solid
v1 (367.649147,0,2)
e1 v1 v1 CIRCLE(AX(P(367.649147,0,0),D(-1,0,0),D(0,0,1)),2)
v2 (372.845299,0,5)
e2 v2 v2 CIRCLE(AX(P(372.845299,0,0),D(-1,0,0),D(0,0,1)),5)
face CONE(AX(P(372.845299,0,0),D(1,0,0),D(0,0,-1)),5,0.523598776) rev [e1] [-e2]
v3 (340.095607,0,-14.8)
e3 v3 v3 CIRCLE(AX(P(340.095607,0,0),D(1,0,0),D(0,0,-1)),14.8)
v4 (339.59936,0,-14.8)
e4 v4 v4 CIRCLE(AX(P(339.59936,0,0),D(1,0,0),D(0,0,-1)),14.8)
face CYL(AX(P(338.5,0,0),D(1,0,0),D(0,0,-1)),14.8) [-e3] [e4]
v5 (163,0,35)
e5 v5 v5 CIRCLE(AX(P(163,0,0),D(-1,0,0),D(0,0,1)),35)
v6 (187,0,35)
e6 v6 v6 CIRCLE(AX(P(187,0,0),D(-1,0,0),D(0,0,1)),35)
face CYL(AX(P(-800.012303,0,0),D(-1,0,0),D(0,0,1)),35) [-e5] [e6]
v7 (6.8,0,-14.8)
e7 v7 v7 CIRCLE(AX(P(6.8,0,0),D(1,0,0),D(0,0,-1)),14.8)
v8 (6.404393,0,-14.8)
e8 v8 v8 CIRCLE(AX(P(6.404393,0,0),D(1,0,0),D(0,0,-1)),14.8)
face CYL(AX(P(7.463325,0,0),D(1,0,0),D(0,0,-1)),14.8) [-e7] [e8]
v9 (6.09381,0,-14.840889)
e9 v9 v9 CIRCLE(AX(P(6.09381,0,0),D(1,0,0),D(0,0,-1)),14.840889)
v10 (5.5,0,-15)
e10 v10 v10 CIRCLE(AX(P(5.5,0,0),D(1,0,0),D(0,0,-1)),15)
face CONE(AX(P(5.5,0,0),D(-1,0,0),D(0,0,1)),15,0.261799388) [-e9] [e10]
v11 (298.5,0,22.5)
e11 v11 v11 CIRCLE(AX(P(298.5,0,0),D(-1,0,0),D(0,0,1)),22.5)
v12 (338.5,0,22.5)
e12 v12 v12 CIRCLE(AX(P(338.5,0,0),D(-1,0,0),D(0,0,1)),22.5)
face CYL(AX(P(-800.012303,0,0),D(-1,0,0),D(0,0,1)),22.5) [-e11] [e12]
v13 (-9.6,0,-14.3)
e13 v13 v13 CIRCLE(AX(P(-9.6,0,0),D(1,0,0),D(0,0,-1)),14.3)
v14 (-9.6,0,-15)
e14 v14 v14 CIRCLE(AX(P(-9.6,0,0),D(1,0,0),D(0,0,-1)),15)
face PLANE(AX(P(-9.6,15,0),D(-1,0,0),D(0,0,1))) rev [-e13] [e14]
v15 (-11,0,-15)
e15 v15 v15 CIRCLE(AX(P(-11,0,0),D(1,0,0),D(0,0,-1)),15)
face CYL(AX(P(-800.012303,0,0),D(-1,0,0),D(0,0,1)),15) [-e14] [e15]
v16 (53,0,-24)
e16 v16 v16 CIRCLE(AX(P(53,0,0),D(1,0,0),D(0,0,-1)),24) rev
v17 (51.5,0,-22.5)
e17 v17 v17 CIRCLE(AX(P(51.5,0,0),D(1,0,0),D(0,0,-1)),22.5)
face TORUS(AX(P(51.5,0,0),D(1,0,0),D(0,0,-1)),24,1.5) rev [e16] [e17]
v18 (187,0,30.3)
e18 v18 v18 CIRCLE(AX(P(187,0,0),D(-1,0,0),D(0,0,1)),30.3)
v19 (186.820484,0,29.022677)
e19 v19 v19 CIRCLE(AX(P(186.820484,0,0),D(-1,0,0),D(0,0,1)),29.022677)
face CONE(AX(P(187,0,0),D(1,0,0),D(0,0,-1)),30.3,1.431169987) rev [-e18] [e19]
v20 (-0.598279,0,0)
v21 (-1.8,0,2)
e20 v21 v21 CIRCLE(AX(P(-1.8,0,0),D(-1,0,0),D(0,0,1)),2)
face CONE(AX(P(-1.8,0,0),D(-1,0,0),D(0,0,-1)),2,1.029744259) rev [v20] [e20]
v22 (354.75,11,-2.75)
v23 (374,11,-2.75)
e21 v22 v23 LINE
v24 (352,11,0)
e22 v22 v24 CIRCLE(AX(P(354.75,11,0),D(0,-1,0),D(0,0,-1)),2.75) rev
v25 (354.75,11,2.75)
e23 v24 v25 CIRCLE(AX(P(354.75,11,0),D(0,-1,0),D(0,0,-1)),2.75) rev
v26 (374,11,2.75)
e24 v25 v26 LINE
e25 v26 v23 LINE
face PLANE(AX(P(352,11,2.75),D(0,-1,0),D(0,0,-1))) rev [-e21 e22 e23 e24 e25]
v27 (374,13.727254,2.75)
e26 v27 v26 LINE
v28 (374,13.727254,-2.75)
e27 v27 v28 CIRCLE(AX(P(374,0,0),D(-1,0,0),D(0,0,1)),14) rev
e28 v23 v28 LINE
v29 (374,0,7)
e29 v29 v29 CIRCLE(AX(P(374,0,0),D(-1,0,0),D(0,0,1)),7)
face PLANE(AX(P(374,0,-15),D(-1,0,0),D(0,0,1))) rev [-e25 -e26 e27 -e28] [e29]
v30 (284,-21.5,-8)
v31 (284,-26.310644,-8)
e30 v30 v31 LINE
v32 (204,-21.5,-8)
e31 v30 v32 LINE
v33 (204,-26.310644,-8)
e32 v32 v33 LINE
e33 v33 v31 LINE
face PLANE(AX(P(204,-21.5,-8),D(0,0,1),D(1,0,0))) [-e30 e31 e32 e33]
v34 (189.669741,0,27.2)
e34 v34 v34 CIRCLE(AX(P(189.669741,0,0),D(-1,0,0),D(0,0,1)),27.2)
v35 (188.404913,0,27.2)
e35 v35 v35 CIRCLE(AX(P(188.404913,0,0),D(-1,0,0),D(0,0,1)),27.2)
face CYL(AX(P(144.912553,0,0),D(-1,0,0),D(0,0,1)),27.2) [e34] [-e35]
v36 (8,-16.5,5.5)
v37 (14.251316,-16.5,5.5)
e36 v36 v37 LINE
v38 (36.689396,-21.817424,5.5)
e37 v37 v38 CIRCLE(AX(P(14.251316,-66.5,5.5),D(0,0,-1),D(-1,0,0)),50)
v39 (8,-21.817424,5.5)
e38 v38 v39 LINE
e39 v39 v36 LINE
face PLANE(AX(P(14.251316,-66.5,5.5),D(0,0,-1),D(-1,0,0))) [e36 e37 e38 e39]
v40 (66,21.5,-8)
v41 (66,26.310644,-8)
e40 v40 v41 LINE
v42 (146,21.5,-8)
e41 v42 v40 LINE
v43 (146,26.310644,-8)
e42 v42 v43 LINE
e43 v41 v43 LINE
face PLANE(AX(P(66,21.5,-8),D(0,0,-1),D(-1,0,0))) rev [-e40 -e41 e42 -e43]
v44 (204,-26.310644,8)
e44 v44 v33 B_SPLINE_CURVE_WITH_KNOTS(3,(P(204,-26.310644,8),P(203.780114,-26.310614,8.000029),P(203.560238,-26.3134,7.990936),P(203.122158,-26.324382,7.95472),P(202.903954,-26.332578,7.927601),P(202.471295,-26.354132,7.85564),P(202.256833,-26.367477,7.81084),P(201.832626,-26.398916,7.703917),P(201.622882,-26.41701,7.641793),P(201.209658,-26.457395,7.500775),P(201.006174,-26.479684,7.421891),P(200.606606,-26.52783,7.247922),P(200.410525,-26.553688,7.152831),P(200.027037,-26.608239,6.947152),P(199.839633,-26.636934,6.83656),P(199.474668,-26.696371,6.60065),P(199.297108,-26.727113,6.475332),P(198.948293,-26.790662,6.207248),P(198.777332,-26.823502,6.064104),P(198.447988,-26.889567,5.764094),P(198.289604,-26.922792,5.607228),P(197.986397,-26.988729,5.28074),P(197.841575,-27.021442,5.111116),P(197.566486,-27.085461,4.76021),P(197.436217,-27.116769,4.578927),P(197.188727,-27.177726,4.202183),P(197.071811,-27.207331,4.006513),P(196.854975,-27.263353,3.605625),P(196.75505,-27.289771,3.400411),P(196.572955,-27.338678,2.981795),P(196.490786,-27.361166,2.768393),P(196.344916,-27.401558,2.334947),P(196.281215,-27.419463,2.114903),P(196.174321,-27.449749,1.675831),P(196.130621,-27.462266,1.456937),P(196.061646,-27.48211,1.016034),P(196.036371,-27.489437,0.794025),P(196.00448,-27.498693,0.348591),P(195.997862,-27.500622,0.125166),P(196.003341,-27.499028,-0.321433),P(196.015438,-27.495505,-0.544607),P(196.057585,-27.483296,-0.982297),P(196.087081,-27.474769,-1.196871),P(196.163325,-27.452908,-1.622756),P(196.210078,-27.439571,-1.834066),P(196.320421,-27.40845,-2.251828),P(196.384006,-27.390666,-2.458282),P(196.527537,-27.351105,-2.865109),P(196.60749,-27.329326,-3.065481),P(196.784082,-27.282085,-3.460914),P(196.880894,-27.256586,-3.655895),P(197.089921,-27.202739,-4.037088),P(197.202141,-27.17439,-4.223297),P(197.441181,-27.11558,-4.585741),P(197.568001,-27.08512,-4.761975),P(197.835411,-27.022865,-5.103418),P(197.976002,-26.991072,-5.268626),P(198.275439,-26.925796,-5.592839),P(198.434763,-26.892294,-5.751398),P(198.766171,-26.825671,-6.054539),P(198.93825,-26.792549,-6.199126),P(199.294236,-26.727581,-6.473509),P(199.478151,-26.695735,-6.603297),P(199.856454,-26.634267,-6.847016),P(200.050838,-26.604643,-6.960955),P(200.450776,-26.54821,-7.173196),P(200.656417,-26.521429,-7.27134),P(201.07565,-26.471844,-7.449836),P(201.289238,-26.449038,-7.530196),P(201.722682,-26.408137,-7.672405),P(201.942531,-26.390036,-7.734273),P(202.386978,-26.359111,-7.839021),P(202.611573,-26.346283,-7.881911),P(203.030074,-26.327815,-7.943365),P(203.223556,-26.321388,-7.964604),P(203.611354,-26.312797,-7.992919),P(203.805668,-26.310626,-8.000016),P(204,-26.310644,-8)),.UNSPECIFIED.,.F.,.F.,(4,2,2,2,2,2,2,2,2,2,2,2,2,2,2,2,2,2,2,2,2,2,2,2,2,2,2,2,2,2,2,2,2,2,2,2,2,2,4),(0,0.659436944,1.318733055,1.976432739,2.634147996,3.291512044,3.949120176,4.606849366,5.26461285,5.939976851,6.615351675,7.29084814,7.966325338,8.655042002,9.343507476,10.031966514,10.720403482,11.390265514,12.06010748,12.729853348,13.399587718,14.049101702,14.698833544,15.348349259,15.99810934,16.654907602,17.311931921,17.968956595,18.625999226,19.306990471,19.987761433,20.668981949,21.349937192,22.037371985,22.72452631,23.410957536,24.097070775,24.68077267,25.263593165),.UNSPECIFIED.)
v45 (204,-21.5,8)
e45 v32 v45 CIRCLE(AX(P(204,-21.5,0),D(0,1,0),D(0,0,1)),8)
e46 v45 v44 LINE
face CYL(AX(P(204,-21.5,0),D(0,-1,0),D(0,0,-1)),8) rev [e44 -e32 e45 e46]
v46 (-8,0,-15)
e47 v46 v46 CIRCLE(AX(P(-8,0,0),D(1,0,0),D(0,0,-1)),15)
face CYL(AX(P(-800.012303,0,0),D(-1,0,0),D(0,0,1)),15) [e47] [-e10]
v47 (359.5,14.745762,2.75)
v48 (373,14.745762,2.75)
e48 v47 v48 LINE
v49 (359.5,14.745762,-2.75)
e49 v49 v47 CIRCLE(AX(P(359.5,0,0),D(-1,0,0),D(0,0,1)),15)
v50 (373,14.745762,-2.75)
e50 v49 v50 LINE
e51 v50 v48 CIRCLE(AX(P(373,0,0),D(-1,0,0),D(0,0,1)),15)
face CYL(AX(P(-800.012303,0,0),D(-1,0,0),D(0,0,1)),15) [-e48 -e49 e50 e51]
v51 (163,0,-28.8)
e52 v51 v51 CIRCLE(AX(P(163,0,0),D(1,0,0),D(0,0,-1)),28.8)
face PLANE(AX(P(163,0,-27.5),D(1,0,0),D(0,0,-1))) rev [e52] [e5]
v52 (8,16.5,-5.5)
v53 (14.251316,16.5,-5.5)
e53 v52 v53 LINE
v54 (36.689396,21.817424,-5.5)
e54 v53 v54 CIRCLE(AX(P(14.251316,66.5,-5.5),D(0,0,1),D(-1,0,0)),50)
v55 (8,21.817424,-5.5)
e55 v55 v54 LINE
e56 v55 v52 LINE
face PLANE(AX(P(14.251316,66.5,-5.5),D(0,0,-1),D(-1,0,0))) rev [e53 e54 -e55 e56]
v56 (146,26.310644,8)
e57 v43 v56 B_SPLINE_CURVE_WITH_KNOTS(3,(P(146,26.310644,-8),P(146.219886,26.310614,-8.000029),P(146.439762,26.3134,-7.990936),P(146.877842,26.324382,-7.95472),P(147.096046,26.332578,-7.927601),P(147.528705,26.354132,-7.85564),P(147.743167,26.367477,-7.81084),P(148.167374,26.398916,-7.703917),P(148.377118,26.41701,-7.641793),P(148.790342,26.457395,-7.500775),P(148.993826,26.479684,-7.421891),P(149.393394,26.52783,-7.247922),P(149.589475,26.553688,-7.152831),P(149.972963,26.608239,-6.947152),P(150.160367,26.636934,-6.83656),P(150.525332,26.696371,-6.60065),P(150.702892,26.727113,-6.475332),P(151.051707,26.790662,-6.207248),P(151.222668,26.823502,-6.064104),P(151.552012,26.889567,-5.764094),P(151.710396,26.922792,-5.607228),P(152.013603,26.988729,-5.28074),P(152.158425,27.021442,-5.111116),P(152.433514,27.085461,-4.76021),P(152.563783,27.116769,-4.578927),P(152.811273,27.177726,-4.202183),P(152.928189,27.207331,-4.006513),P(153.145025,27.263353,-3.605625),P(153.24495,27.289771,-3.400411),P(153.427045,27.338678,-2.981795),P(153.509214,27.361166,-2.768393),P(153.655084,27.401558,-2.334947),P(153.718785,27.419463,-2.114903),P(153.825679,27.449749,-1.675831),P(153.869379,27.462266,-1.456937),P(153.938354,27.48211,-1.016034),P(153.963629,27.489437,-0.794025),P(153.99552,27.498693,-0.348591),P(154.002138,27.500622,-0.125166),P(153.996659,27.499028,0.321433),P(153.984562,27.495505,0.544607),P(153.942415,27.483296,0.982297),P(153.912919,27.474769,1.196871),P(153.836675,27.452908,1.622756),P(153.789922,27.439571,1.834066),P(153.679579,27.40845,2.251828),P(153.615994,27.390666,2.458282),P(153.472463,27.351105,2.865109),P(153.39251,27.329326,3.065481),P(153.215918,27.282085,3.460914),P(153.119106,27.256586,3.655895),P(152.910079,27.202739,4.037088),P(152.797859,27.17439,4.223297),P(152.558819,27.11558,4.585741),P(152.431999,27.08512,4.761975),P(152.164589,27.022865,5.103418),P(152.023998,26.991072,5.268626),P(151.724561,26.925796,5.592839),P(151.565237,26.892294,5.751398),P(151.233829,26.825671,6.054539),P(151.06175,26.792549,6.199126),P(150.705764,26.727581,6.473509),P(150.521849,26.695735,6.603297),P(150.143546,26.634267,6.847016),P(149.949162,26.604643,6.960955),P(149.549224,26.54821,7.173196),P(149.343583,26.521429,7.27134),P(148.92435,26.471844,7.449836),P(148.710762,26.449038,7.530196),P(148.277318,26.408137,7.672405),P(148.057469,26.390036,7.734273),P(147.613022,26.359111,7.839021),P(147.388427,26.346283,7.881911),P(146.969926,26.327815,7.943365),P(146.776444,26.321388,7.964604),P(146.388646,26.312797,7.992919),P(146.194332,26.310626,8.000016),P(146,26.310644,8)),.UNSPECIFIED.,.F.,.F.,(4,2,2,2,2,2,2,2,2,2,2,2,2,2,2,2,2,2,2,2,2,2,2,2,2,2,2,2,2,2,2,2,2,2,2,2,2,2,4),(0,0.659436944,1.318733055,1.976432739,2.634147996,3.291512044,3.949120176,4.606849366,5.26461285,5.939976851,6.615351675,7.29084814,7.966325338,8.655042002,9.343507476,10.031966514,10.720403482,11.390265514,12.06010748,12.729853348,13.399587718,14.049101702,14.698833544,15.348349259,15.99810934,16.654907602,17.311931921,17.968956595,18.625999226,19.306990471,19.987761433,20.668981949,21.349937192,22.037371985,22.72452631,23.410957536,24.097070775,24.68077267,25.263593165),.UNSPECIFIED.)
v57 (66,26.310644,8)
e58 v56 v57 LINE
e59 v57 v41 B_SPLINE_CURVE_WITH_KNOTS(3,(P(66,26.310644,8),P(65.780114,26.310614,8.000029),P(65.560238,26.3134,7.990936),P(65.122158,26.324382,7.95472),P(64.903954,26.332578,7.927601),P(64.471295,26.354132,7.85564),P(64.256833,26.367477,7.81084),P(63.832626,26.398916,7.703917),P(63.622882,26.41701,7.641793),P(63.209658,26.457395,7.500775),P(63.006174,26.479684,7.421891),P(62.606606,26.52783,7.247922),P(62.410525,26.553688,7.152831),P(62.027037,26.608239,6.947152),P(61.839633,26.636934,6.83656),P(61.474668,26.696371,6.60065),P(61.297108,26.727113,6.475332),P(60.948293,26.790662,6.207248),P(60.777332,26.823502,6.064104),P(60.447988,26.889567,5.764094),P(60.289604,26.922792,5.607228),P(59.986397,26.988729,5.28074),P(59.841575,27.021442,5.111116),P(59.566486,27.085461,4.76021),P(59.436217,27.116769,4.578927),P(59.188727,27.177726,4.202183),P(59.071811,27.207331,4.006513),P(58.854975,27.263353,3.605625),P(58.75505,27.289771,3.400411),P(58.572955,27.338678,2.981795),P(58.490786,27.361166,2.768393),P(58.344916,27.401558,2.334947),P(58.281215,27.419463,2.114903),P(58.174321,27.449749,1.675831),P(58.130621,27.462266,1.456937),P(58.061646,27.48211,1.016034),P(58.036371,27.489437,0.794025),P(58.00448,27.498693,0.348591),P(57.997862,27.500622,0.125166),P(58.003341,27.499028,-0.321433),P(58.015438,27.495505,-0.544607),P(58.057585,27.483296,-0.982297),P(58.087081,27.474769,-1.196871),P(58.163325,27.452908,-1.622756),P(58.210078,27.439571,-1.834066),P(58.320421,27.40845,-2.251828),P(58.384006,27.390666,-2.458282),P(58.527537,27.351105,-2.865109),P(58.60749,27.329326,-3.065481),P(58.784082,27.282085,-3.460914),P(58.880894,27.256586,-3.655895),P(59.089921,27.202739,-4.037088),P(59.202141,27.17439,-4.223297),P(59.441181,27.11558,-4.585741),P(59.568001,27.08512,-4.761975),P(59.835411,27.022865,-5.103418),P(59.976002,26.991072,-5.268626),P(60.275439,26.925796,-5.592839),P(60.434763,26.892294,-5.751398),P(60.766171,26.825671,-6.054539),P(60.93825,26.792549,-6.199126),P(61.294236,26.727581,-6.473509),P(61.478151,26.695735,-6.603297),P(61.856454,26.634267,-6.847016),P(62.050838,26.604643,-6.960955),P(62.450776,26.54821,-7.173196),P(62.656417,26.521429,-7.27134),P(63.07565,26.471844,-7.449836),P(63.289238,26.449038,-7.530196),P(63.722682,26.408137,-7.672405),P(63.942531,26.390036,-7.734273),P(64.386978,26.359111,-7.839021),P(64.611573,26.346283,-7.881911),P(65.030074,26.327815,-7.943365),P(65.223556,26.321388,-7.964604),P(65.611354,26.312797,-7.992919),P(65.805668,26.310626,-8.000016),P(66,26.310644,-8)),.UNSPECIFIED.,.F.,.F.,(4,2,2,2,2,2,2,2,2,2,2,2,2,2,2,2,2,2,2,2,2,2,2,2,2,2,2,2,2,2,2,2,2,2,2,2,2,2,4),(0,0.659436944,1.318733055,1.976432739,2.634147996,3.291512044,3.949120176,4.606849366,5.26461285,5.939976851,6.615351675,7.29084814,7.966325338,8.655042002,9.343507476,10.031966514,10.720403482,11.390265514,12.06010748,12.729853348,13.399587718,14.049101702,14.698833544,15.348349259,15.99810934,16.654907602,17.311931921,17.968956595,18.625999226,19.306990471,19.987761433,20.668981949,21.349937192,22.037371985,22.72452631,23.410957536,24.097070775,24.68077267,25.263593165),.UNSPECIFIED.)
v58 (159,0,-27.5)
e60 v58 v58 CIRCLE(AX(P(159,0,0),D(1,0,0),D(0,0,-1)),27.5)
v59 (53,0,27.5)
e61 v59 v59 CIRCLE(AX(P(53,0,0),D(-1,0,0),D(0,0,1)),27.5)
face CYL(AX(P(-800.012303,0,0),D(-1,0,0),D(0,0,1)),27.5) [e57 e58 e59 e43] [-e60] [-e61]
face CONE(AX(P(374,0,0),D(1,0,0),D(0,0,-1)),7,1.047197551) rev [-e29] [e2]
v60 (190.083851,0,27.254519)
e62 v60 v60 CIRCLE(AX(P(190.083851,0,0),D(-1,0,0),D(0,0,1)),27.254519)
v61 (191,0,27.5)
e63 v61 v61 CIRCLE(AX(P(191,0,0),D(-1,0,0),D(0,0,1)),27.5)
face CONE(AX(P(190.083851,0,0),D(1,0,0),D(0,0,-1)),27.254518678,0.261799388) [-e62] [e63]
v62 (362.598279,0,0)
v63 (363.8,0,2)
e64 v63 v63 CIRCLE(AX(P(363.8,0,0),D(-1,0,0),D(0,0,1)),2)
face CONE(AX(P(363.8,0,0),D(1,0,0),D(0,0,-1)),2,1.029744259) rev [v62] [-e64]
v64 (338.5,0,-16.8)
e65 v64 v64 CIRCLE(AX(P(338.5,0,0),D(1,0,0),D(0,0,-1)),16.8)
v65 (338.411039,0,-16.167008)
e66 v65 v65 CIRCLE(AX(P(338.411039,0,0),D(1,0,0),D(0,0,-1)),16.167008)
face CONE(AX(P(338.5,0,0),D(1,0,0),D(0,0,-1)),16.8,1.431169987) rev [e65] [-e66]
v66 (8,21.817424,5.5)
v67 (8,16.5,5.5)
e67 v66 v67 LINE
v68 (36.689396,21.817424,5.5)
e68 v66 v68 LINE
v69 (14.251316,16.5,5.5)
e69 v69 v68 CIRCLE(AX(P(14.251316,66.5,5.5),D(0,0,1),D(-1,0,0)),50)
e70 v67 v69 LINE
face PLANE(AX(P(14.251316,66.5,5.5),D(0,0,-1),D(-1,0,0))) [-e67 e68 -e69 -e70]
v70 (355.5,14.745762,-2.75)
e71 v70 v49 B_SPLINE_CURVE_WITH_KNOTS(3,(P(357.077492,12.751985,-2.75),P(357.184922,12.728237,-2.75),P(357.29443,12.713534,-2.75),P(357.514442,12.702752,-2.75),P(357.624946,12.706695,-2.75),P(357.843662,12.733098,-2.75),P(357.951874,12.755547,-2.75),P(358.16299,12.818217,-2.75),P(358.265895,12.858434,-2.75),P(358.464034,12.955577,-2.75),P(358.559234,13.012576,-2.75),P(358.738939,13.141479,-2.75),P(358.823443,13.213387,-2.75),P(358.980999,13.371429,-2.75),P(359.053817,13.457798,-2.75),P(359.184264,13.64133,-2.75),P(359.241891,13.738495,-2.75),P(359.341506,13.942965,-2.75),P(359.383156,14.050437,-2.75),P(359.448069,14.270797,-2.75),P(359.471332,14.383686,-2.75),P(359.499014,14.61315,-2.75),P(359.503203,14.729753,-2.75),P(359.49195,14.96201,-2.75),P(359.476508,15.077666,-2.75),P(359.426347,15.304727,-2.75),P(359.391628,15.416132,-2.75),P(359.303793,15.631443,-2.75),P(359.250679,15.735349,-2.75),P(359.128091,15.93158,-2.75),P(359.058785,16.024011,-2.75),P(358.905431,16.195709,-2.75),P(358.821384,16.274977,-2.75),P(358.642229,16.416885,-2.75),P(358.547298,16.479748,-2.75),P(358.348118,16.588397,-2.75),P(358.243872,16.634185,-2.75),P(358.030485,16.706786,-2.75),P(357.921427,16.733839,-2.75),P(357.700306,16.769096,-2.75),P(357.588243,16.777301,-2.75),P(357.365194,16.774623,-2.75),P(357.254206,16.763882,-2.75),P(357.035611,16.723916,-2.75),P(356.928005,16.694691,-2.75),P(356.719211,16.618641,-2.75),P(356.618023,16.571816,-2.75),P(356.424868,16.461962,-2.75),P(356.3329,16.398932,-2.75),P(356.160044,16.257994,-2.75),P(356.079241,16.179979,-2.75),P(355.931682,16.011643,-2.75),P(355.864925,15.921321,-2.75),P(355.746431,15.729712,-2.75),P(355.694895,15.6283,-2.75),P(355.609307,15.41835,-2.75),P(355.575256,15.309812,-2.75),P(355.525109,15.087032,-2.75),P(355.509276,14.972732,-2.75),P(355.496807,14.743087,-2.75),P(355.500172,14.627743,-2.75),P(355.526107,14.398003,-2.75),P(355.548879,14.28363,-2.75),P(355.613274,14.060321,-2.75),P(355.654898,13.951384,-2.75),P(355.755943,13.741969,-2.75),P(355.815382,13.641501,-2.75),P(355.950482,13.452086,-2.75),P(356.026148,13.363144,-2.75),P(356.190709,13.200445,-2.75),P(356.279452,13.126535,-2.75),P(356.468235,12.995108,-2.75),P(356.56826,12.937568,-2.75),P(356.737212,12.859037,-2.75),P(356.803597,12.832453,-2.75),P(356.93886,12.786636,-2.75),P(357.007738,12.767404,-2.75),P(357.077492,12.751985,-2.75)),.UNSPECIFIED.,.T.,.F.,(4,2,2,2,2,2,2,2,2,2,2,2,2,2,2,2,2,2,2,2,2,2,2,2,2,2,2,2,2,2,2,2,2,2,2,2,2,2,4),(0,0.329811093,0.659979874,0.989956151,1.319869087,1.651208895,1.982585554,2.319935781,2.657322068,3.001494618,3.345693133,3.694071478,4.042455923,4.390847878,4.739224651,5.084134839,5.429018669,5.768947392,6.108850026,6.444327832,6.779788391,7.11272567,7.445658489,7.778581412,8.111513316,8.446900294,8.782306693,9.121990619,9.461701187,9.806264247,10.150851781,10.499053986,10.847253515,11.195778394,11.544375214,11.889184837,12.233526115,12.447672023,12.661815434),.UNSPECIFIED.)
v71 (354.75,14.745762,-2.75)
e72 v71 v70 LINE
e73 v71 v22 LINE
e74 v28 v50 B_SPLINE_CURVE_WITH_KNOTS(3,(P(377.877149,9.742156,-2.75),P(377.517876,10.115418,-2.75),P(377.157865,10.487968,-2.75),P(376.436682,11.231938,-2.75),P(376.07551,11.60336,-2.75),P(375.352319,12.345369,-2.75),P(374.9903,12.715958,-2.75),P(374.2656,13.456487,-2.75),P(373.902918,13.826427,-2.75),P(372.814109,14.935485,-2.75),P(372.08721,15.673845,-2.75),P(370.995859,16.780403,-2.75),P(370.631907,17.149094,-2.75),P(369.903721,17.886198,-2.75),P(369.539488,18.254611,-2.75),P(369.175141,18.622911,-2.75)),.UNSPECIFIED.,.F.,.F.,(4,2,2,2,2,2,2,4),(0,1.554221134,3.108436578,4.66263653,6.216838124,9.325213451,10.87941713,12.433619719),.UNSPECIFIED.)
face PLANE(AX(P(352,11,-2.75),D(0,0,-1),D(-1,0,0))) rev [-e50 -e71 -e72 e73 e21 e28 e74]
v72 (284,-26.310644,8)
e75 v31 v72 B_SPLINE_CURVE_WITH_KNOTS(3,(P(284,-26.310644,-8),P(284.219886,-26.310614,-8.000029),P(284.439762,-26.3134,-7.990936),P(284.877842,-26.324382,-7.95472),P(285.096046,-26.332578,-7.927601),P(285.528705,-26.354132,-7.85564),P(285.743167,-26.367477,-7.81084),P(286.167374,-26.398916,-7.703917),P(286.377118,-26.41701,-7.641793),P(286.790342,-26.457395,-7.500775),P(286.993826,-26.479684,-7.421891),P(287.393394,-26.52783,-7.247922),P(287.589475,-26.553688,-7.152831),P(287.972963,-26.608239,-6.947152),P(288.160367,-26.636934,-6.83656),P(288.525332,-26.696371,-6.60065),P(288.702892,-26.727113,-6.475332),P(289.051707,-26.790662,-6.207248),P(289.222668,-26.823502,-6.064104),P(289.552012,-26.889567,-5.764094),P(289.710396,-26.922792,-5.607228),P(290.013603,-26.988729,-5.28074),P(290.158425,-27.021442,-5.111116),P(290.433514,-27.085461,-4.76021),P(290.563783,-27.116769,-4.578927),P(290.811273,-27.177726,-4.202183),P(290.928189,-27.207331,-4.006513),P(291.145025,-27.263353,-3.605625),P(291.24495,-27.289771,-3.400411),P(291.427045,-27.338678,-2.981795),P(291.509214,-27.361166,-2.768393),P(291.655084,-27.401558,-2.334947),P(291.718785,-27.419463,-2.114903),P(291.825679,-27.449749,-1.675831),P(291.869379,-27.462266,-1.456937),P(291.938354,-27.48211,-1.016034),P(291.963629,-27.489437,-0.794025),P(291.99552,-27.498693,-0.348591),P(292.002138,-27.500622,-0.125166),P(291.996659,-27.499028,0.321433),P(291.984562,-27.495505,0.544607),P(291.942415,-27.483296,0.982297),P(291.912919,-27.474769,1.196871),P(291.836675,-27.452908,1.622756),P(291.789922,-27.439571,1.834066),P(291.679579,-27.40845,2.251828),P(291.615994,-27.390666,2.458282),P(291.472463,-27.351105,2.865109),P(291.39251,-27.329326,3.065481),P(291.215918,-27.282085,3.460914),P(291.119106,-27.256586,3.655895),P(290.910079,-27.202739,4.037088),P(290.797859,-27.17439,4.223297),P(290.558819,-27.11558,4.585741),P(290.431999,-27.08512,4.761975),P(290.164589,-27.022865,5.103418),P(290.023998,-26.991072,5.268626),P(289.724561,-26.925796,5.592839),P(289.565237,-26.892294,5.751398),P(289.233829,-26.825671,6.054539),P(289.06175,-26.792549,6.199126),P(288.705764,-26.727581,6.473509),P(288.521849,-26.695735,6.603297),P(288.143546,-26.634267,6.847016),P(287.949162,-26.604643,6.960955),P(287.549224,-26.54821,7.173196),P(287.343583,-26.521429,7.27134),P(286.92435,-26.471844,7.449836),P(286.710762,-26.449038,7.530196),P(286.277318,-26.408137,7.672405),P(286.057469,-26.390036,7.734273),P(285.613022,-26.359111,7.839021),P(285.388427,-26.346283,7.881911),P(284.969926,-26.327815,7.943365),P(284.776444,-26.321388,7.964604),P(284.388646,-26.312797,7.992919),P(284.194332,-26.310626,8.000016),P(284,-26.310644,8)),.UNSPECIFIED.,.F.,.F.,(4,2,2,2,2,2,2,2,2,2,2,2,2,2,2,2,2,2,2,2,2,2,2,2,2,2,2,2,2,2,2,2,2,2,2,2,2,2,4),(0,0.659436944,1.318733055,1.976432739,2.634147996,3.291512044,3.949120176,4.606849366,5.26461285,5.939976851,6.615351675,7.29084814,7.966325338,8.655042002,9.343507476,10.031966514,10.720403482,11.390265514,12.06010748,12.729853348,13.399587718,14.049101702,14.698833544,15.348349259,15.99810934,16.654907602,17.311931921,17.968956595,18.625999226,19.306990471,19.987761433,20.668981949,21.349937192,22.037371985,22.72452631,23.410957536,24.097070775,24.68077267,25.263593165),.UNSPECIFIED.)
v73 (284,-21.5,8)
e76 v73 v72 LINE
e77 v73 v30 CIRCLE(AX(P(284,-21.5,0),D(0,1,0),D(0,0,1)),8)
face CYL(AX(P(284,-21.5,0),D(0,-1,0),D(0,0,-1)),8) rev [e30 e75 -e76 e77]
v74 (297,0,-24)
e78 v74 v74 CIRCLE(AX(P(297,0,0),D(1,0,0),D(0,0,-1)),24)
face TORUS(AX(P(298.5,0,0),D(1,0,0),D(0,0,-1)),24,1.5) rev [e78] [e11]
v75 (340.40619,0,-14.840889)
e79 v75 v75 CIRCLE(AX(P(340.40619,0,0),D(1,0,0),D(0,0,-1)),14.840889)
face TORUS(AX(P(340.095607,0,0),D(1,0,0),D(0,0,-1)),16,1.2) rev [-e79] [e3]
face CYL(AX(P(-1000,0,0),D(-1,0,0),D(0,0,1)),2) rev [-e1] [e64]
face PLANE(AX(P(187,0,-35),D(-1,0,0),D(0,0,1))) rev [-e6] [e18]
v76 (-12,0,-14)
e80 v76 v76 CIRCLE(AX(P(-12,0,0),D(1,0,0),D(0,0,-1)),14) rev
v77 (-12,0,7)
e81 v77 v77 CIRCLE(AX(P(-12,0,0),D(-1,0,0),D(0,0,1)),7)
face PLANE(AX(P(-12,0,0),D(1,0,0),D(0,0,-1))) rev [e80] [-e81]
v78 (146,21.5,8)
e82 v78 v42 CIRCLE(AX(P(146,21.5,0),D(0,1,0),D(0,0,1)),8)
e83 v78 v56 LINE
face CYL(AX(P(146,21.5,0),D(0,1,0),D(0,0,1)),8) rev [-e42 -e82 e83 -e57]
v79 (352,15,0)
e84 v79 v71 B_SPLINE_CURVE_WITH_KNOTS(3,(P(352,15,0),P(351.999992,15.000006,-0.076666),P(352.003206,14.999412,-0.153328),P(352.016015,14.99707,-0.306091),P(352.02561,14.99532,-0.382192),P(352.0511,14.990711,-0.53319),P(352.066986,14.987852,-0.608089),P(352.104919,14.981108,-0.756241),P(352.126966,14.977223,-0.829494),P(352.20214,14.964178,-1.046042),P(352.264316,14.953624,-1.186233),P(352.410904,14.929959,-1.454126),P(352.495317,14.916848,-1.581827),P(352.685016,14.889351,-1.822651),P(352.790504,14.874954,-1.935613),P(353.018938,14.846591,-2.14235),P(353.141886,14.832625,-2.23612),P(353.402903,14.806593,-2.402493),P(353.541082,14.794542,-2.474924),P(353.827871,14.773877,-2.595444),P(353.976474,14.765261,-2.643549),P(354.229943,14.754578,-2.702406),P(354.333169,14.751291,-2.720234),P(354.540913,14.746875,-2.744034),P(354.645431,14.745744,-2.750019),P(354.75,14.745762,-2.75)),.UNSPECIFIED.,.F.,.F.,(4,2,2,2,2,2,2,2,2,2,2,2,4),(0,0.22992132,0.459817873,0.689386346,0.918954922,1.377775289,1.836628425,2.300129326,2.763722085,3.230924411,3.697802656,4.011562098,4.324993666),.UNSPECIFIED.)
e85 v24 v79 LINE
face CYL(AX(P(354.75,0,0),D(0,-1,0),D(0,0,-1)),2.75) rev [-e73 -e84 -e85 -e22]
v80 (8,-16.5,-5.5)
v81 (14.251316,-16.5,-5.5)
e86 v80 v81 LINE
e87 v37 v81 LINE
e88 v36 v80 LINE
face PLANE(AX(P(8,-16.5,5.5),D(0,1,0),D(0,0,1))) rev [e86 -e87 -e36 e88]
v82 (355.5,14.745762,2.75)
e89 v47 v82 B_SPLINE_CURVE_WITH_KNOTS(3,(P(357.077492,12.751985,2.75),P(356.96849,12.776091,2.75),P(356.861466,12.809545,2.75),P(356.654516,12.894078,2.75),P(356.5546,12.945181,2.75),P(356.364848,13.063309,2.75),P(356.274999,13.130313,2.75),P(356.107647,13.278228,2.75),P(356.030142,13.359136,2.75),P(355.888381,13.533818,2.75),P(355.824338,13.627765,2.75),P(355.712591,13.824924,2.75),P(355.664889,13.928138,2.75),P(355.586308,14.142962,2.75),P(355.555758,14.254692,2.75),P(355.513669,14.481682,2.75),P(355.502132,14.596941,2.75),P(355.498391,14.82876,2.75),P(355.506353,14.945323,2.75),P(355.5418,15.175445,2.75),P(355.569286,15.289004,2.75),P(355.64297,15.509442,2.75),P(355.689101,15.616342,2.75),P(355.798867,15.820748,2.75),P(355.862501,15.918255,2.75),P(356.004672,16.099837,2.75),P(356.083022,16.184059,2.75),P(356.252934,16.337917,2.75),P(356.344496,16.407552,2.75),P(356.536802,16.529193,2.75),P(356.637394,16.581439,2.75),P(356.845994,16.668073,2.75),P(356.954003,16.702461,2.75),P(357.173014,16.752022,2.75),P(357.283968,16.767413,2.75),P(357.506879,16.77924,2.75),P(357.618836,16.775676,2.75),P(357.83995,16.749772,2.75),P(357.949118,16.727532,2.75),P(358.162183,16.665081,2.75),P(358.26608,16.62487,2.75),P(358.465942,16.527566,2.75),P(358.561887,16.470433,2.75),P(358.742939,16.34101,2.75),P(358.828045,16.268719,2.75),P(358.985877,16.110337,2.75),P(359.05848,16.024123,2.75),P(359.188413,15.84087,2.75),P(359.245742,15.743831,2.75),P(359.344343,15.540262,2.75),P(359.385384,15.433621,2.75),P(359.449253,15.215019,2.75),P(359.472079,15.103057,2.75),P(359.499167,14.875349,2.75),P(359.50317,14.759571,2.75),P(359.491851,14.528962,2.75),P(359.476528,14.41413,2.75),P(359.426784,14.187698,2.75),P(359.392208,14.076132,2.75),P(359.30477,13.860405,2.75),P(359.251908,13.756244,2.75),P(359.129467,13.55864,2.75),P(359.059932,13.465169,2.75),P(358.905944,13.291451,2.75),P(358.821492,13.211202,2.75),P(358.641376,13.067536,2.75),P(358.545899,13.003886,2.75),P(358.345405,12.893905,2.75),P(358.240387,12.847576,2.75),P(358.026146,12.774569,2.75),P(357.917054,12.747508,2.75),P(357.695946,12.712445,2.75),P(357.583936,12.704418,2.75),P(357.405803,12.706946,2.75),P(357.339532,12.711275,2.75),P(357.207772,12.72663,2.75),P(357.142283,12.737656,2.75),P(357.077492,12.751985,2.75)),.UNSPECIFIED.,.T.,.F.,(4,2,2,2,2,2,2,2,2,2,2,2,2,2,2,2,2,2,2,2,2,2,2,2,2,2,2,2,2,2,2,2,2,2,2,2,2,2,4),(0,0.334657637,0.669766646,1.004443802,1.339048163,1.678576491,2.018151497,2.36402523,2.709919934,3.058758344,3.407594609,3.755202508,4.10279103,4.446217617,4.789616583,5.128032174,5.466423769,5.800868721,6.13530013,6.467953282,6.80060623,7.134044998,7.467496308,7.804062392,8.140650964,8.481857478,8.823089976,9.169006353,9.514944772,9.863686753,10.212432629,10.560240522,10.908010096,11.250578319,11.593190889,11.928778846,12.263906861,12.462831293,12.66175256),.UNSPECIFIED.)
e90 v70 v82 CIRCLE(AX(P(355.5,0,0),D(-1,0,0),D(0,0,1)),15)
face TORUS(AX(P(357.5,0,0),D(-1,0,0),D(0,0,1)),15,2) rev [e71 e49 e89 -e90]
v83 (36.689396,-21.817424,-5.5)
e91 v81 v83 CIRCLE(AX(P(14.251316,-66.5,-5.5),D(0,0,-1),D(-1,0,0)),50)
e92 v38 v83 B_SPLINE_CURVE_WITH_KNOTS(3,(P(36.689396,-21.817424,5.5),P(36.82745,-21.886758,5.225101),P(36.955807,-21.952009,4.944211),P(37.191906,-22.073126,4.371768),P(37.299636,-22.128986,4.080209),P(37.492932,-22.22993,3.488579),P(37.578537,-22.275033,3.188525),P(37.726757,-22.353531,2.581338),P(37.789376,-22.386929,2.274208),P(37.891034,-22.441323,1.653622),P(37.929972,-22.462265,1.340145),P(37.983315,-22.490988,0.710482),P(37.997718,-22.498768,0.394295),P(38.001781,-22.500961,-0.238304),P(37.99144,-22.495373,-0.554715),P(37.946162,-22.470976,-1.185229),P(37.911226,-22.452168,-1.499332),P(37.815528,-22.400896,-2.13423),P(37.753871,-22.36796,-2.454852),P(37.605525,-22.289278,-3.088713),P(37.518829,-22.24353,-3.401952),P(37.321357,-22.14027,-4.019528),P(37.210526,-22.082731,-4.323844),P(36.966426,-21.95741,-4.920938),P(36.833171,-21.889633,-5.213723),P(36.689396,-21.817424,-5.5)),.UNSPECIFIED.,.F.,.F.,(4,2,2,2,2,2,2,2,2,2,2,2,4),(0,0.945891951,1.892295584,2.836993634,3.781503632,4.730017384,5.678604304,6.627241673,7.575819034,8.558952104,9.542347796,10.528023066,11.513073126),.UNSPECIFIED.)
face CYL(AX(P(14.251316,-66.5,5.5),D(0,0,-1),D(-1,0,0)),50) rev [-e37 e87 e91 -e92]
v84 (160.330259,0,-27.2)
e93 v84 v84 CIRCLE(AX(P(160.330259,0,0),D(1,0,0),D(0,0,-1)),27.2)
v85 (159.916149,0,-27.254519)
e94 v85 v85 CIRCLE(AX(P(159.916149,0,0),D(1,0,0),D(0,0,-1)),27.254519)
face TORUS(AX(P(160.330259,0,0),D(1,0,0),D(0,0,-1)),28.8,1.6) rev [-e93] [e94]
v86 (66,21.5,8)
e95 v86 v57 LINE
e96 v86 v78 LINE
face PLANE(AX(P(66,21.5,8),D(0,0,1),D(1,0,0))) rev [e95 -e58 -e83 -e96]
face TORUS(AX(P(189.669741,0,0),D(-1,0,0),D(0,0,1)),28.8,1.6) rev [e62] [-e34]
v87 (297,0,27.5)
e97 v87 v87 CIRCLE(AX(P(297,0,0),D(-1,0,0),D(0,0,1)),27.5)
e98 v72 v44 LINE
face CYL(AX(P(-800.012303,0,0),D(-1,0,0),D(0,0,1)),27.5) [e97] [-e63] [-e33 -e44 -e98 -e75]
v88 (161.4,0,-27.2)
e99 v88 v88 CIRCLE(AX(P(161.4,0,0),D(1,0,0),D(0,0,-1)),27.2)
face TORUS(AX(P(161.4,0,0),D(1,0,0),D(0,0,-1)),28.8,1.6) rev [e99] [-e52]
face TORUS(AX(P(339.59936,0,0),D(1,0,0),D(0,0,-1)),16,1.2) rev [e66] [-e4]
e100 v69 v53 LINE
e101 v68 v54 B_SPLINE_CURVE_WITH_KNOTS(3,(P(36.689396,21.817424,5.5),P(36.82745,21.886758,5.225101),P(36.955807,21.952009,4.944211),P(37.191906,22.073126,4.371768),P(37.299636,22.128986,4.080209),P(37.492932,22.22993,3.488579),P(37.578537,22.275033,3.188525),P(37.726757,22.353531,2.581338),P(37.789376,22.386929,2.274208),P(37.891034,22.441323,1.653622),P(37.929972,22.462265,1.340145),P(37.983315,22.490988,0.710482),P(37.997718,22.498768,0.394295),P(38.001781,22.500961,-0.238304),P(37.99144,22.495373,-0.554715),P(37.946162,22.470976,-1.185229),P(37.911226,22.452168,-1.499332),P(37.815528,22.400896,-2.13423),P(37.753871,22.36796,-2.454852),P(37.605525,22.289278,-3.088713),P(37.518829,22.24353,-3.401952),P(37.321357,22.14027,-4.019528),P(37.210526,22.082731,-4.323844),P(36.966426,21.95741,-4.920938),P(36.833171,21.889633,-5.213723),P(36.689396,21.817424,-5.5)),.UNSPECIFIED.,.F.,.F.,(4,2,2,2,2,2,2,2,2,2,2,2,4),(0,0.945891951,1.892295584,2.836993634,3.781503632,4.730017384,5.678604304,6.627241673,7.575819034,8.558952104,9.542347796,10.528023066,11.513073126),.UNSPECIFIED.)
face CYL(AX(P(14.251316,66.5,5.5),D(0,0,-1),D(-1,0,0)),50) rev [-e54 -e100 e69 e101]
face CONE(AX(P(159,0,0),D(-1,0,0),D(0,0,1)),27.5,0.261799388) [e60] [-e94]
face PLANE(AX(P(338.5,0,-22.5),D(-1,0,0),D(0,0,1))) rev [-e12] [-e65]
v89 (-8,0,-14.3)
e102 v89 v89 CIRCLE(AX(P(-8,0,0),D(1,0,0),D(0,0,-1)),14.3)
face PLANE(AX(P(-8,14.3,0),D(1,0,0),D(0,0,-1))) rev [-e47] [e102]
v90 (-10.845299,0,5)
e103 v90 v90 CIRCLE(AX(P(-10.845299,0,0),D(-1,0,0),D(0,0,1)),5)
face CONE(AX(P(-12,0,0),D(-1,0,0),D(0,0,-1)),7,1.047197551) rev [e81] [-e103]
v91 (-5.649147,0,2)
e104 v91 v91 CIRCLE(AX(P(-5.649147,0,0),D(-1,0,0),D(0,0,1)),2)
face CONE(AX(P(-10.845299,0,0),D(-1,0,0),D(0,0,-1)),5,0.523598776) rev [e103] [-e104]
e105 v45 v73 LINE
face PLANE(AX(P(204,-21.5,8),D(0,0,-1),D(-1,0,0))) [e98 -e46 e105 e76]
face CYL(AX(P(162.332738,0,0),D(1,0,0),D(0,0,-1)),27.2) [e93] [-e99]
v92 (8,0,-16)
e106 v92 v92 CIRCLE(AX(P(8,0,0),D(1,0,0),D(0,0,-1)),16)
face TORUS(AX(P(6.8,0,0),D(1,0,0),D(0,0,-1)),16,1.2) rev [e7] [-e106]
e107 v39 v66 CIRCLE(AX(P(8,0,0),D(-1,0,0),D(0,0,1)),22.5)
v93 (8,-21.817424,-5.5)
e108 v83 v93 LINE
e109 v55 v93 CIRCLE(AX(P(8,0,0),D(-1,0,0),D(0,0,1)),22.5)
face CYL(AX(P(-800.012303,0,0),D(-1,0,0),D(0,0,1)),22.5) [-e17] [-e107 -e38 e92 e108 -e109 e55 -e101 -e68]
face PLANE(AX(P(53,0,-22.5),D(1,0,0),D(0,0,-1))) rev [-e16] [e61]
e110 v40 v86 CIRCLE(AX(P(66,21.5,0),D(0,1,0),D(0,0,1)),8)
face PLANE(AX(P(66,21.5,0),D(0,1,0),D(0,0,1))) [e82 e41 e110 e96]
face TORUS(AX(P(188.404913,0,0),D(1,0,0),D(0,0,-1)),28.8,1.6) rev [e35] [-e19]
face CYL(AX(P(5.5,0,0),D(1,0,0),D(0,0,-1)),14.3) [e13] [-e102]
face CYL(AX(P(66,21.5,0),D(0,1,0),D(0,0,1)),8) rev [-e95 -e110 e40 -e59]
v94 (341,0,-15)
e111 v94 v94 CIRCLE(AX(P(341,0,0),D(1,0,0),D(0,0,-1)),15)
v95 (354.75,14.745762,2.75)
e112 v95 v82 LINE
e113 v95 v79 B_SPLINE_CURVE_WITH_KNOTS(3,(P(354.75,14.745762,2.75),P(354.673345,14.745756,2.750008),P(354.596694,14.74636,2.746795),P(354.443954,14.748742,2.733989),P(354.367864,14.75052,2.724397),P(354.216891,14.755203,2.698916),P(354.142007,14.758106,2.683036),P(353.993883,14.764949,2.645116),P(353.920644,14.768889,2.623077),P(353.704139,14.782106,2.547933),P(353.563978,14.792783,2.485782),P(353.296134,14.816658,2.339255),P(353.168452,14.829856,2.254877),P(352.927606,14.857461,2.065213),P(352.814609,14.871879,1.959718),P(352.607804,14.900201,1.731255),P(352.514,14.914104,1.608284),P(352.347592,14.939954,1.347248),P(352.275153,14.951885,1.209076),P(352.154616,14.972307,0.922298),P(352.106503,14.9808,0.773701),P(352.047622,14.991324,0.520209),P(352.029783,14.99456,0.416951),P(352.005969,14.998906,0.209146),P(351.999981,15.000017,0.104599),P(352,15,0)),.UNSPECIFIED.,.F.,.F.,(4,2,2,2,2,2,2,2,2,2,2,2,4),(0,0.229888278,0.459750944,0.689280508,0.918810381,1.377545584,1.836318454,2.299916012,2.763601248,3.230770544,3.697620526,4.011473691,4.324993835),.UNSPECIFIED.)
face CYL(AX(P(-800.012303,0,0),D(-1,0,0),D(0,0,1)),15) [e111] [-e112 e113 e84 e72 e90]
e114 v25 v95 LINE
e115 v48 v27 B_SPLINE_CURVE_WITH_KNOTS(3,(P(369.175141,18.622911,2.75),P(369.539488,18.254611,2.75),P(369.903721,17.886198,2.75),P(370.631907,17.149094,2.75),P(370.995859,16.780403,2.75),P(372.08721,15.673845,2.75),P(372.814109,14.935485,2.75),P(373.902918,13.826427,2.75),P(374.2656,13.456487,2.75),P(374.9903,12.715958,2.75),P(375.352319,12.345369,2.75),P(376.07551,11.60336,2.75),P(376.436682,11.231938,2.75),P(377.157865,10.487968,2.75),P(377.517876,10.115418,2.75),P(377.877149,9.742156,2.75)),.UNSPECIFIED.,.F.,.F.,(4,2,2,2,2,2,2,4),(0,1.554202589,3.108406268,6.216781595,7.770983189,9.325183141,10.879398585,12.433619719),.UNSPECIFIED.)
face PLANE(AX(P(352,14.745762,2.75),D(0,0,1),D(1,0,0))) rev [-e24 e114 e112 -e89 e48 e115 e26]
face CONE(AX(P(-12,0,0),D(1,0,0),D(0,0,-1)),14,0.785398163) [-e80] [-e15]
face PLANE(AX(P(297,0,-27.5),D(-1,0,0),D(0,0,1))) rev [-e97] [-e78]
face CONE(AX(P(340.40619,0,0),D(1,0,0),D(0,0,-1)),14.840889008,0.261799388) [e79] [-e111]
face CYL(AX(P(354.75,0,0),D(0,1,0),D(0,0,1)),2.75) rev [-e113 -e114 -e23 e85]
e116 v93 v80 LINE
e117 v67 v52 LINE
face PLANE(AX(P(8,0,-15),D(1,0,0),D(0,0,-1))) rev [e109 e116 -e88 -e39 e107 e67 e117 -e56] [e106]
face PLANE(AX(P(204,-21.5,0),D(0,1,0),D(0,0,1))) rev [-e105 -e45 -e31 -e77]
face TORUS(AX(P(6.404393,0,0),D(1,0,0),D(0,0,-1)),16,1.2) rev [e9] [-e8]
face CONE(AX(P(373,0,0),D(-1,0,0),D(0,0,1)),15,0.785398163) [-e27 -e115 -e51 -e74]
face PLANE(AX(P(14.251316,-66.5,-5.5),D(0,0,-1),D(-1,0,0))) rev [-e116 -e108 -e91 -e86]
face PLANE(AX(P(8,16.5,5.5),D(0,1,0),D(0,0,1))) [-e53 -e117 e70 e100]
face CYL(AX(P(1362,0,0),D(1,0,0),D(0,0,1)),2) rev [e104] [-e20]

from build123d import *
from build123d.topology import SkipClean

# Parameters (mm, degrees)
SKETCH10_W                  = 1.6
SKETCH10_H                  = 0.7
UTOR_ZA_ALAT_ZA_LEZAJ_DEPTH = 5.5
CHAMFER1_SIZE               = 1
LIJEVI_START                = 27.5
LIJEVI_UTOR_ZA_PERO_DEPTH   = 6
DESNI_START                 = -27.5
DESNI_UTOR_ZA_PERO_DEPTH    = 6
CUT_EXTRUDE1_DEPTH          = 22
FILLET1_R                   = 2.75


# Read off the part's stored shape, not the designer's step: Cut-Revolve3
with BuildPart() as part:
    # Sketch2 → Glavno vratilo (revolve)
    with BuildSketch(Plane(origin=(0, 0, 0), x_dir=(1, 0, 0), z_dir=(0, 1, 0)), mode=Mode.PRIVATE) as glavno_vratilo_sk:
        Polygon((0, 0), (-12, 0), (-12, 15), (8, 15), (8, 22.5), (53, 22.5), (53, 27.5), (163, 27.5), (163, 35), (187, 35), (187, 27.5), (297, 27.5), (297, 22.5), (338.5, 22.5), (338.5, 15), (374, 15), (374, 0), align=None)
    revolve(glavno_vratilo_sk.sketch.rotate(Axis((-800.012303149, 0, 0), (1, 0, 0)), 180), axis=Axis((-800.012303149, 0, 0), (1, 0, 0)))

    # Sketch3 → Revolve2 (revolve)
    with BuildSketch(Plane.XY, mode=Mode.PRIVATE) as revolve2_sk:
        with BuildLine():
            Line((8, 15), (8, 16))
            ThreePointArc((8, 16), (7.857352815, 15.432545134), (7.463324958, 15))
            Line((7.463324958, 15), (8, 15))
        make_face()
    revolve(revolve2_sk.sketch.rotate(Axis((-800.012303149, 0, 0), (-1, 0, 0)), 90), axis=Axis((-800.012303149, 0, 0), (-1, 0, 0)))

    # Sketch3<6> → Cut-Revolve1 (revolve, cut)
    with BuildSketch(Plane.XY, mode=Mode.PRIVATE) as cut_revolve1_sk:
        with BuildLine():
            ThreePointArc((6.8, 14.8), (7.146410162, 14.851087471), (7.463324958, 15))
            Line((7.463324958, 15), (5.5, 15))
            Line((5.5, 15), (6.093810304, 14.840889008))
            ThreePointArc((6.093810304, 14.840889008), (6.247761728, 14.810266166), (6.404393159, 14.8))
            Line((6.404393159, 14.8), (6.8, 14.8))
        make_face()
    revolve(cut_revolve1_sk.sketch.rotate(Axis((-800.012303149, 0, 0), (-1, 0, 0)), 90), axis=Axis((-800.012303149, 0, 0), (-1, 0, 0)), mode=Mode.SUBTRACT)

    # Sketch4 → Revolve3 (revolve)
    with SkipClean():  # the faces are left unmerged after this step: merging them gives an invalid solid
        with BuildSketch(Plane.XY, mode=Mode.PRIVATE) as revolve3_sk:
            with BuildLine():
                Line((53, 24), (53, 22.5))
                Line((53, 22.5), (51.5, 22.5))
                ThreePointArc((51.5, 22.5), (52.560660172, 22.939339828), (53, 24))
            make_face()
        revolve(revolve3_sk.sketch.rotate(Axis((-800.012303149, 0, 0), (-1, 0, 0)), 90), axis=Axis((-800.012303149, 0, 0), (-1, 0, 0)))

    # Sketch5 → Revolve4 (revolve)
    with SkipClean():  # the faces are left unmerged after this step: merging them gives an invalid solid
        with BuildSketch(Plane.XY, mode=Mode.PRIVATE) as revolve4_sk:
            with BuildLine():
                Line((163, 27.5), (163, 28.8))
                ThreePointArc((163, 28.8), (162.823443123, 28.0693772), (162.332737905, 27.5))
                Line((162.332737905, 27.5), (163, 27.5))
            make_face()
        revolve(revolve4_sk.sketch.rotate(Axis((-800.012303149, 0, 0), (-1, 0, 0)), 90), axis=Axis((-800.012303149, 0, 0), (-1, 0, 0)))

    # Sketch5<3> → Cut-Revolve2 (revolve, cut)
    with SkipClean():  # the faces are left unmerged after this step: merging them gives an invalid solid
        with BuildSketch(Plane.XY, mode=Mode.PRIVATE) as cut_revolve2_sk:
            with BuildLine():
                ThreePointArc((161.4, 27.2), (161.889897949, 27.276845379), (162.332737905, 27.5))
                Line((162.332737905, 27.5), (159, 27.5))
                Line((159, 27.5), (159.916148766, 27.254518678))
                ThreePointArc((159.916148766, 27.254518678), (160.121417331, 27.213688222), (160.330259238, 27.2))
                Line((160.330259238, 27.2), (161.4, 27.2))
            make_face()
        revolve(cut_revolve2_sk.sketch.rotate(Axis((-800.012303149, 0, 0), (-1, 0, 0)), 90), axis=Axis((-800.012303149, 0, 0), (-1, 0, 0)), mode=Mode.SUBTRACT)

    # Sketch6 → Revolve5 (revolve)
    with SkipClean():  # the faces are left unmerged after this step: merging them gives an invalid solid
        with BuildSketch(Plane.XY, mode=Mode.PRIVATE) as revolve5_sk:
            with BuildLine():
                Line((187, 27.5), (187.472174959, 27.5))
                ThreePointArc((187.472174959, 27.5), (187.205940273, 27.740535642), (187, 28.034350051))
                Line((187, 28.034350051), (187, 27.5))
            make_face()
        revolve(revolve5_sk.sketch.rotate(Axis((-800.012303149, 0, 0), (-1, 0, 0)), 90), axis=Axis((-800.012303149, 0, 0), (-1, 0, 0)))

    # Cut-Revolve3 outline → Cut-Revolve3 (revolve, cut)
    with SkipClean():  # the faces are left unmerged after this step: merging them gives an invalid solid
        with BuildSketch(Plane.YX):
            with BuildLine():
                ThreePointArc((27.254518678, 190.083851234), (27.213688222, 189.878582669), (27.2, 189.669740762))
                Line((27.2, 189.669740762), (27.2, 188.404912864))
                ThreePointArc((27.2, 188.404912864), (27.276845379, 187.915014916), (27.5, 187.47217496))
                Line((27.5, 187.47217496), (27.5, 191))
                Line((27.5, 191), (27.254518678, 190.083851234))
            make_face()
            with BuildLine():
                Line((30.3, 187), (28.034350052, 187))
                ThreePointArc((28.034350052, 187), (28.514060463, 186.83067064), (29.022676962, 186.820483954))
                Line((29.022676962, 186.820483954), (30.3, 187))
            make_face()
        revolve(axis=Axis((0, 0, 0), (1, 0, 0)), mode=Mode.SUBTRACT)

    # Sketch7 → Revolve6 (revolve)
    with SkipClean():  # the faces are left unmerged after this step: merging them gives an invalid solid
        with BuildSketch(Plane.XY, mode=Mode.PRIVATE) as revolve6_sk:
            with BuildLine():
                Line((298.5, 22.5), (297, 22.5))
                Line((297, 22.5), (297, 24))
                ThreePointArc((297, 24), (297.439339828, 22.939339828), (298.5, 22.5))
            make_face()
        revolve(revolve6_sk.sketch.rotate(Axis((-800.012303149, 0, 0), (-1, 0, 0)), 270), axis=Axis((-800.012303149, 0, 0), (-1, 0, 0)))

    # Sketch8 → Revolve7 (revolve)
    with SkipClean():  # the faces are left unmerged after this step: merging them gives an invalid solid
        with BuildSketch(Plane.XY, mode=Mode.PRIVATE) as revolve7_sk:
            with BuildLine():
                Line((338.5, 15), (338.936035461, 15))
                ThreePointArc((338.936035461, 15), (338.680615152, 15.228049786), (338.5, 15.51895253))
                Line((338.5, 15.51895253), (338.5, 15))
            make_face()
        revolve(revolve7_sk.sketch.rotate(Axis((-800.012303149, 0, 0), (-1, 0, 0)), 270), axis=Axis((-800.012303149, 0, 0), (-1, 0, 0)))

    # Sketch8<4> → Cut-Revolve4 (revolve, cut)
    with SkipClean():  # the faces are left unmerged after this step: merging them gives an invalid solid
        with BuildSketch(Plane.XY, mode=Mode.PRIVATE) as cut_revolve4_sk:
            with BuildLine():
                Line((340.406189696, 14.840889008), (341, 15))
                Line((341, 15), (338.936035461, 15))
                ThreePointArc((338.936035461, 15), (339.252950258, 14.851087471), (339.599360419, 14.8))
                Line((339.599360419, 14.8), (340.095606841, 14.8))
                ThreePointArc((340.095606841, 14.8), (340.252238272, 14.810266166), (340.406189696, 14.840889008))
            make_face()
            with BuildLine():
                ThreePointArc((338.411038737, 16.167007721), (338.410509616, 15.836801447), (338.5, 15.51895253))
                Line((338.5, 15.51895253), (338.5, 16.8))
                Line((338.5, 16.8), (338.411038737, 16.167007721))
            make_face()
        revolve(cut_revolve4_sk.sketch.rotate(Axis((-800.012303149, 0, 0), (-1, 0, 0)), 90), axis=Axis((-800.012303149, 0, 0), (-1, 0, 0)), mode=Mode.SUBTRACT)

    # Sketch10 → Utor za uskocnik (revolve, cut)
    with SkipClean():  # the faces are left unmerged after this step: merging them gives an invalid solid
        with BuildSketch(Plane.XY, mode=Mode.PRIVATE) as utor_za_uskocnik_sk:
            with Locations((-8.8, 14.65)):
                Rectangle(SKETCH10_W, SKETCH10_H)
        revolve(utor_za_uskocnik_sk.sketch.rotate(Axis((-800.012303149, 0, 0), (-1, 0, 0)), 90), axis=Axis((-800.012303149, 0, 0), (-1, 0, 0)), mode=Mode.SUBTRACT)

    # Sketch11 → Utor za alat za lezaj (cut, symmetric)
    with SkipClean():  # the faces are left unmerged after this step: merging them gives an invalid solid
        with BuildSketch(Plane.XY):
            with BuildLine():
                Line((38, 22.5), (8, 22.5))
                Line((8, 22.5), (8, 16.5))
                Line((8, 16.5), (14.251315826, 16.5))
                ThreePointArc((14.251315826, 16.5), (26.49876454, 18.023201426), (38, 22.5))
            make_face()
        utor_za_alat_za_lezaj = extrude(amount=UTOR_ZA_ALAT_ZA_LEZAJ_DEPTH, both=True, mode=Mode.SUBTRACT)

    # Mirror1: Utor za alat za lezaj across plane
    with SkipClean():  # the faces are left unmerged after this step: merging them gives an invalid solid
        add(utor_za_alat_za_lezaj.mirror(Plane.ZX), mode=Mode.SUBTRACT)

    # Sketch12 → Utor za izlaz nareznice (revolve, cut)
    with SkipClean():  # the faces are left unmerged after this step: merging them gives an invalid solid
        with BuildSketch(Plane.XY, mode=Mode.PRIVATE) as utor_za_izlaz_nareznice_sk:
            with BuildLine():
                Line((355.5, -15), (359.5, -15))
                ThreePointArc((359.5, -15), (357.5, -13), (355.5, -15))
            make_face()
        revolve(utor_za_izlaz_nareznice_sk.sketch.rotate(Axis((-1000, 0, 0), (1, 0, 0)), 270), axis=Axis((-1000, 0, 0), (1, 0, 0)), mode=Mode.SUBTRACT)

    # Sketch14 → Cut-Revolve7 (revolve, cut)
    with SkipClean():  # the faces are left unmerged after this step: merging them gives an invalid solid
        with BuildSketch(Plane.XY, mode=Mode.PRIVATE) as cut_revolve7_sk:
            Polygon((362.598278762, 0), (363.8, 2), (367.649147039, 2), (372.845299462, 5), (374, 7), (374, 0), align=None)
        cut_revolve7 = revolve(cut_revolve7_sk.sketch.rotate(Axis((-1000, 0, 0), (1, 0, 0)), 90), axis=Axis((-1000, 0, 0), (1, 0, 0)), mode=Mode.SUBTRACT)

    # Mirror2: Cut-Revolve7 across plane
    with SkipClean():  # the faces are left unmerged after this step: merging them gives an invalid solid
        add(cut_revolve7.mirror(Plane(origin=(181, 0, 0), x_dir=(0, 0, 1), z_dir=(1, 0, 0))), mode=Mode.SUBTRACT)

    # Chamfer1
    chamfer1_edges = [part.edges().sort_by_distance(p)[0] for p in [
        (374, 0, -15),
        (-12, 0, -15),
    ]]
    chamfer(chamfer1_edges, length=CHAMFER1_SIZE)

    # Sketch15 → Lijevi utor za pero (cut)
    with SkipClean():  # the faces are left unmerged after this step: merging them gives an invalid solid
        with BuildSketch(Plane(origin=(0, 0, 0), x_dir=(1, 0, 0), z_dir=(0, 1, 0)).offset(LIJEVI_START)):
            with BuildLine():
                Line((66, 8), (146, 8))
                ThreePointArc((146, 8), (154, 0), (146, -8))
                Line((146, -8), (66, -8))
                ThreePointArc((66, -8), (58, 0), (66, 8))
            make_face()
        extrude(amount=-LIJEVI_UTOR_ZA_PERO_DEPTH, mode=Mode.SUBTRACT)

    # Sketch16 → Desni utor za pero (cut)
    with SkipClean():  # the faces are left unmerged after this step: merging them gives an invalid solid
        with BuildSketch(Plane(origin=(0, 0, 0), x_dir=(1, 0, 0), z_dir=(0, 1, 0)).offset(DESNI_START)):
            with BuildLine():
                Line((204, 8), (284, 8))
                ThreePointArc((284, 8), (292, 0), (284, -8))
                Line((284, -8), (204, -8))
                ThreePointArc((204, -8), (196, 0), (204, 8))
            make_face()
        extrude(amount=DESNI_UTOR_ZA_PERO_DEPTH, mode=Mode.SUBTRACT)

    # Sketch17 → Cut-Extrude1 (cut)
    with SkipClean():  # the faces are left unmerged after this step: merging them gives an invalid solid
        with BuildSketch(Plane(origin=(374, 0, 0), x_dir=(0, 0, -1), z_dir=(1, 0, 0))):
            with BuildLine():
                Line((-2.75, 14.745762103), (-2.75, 11))
                Line((-2.75, 11), (2.75, 11))
                Line((2.75, 11), (2.75, 14.745762103))
                ThreePointArc((2.75, 14.745762103), (0, 15), (-2.75, 14.745762103))
            make_face()
        extrude(amount=-CUT_EXTRUDE1_DEPTH, mode=Mode.SUBTRACT)

    # Fillet1
    fillet1_edges = [part.edges().sort_by_distance(p)[0] for p in [
        (352, 12.872881052, 2.75),
        (352, 12.872881052, -2.75),
    ]]
    fillet(fillet1_edges, radius=FILLET1_R - 0.0001)  # a hair under: the kernel refuses the full size


solid = part.part
